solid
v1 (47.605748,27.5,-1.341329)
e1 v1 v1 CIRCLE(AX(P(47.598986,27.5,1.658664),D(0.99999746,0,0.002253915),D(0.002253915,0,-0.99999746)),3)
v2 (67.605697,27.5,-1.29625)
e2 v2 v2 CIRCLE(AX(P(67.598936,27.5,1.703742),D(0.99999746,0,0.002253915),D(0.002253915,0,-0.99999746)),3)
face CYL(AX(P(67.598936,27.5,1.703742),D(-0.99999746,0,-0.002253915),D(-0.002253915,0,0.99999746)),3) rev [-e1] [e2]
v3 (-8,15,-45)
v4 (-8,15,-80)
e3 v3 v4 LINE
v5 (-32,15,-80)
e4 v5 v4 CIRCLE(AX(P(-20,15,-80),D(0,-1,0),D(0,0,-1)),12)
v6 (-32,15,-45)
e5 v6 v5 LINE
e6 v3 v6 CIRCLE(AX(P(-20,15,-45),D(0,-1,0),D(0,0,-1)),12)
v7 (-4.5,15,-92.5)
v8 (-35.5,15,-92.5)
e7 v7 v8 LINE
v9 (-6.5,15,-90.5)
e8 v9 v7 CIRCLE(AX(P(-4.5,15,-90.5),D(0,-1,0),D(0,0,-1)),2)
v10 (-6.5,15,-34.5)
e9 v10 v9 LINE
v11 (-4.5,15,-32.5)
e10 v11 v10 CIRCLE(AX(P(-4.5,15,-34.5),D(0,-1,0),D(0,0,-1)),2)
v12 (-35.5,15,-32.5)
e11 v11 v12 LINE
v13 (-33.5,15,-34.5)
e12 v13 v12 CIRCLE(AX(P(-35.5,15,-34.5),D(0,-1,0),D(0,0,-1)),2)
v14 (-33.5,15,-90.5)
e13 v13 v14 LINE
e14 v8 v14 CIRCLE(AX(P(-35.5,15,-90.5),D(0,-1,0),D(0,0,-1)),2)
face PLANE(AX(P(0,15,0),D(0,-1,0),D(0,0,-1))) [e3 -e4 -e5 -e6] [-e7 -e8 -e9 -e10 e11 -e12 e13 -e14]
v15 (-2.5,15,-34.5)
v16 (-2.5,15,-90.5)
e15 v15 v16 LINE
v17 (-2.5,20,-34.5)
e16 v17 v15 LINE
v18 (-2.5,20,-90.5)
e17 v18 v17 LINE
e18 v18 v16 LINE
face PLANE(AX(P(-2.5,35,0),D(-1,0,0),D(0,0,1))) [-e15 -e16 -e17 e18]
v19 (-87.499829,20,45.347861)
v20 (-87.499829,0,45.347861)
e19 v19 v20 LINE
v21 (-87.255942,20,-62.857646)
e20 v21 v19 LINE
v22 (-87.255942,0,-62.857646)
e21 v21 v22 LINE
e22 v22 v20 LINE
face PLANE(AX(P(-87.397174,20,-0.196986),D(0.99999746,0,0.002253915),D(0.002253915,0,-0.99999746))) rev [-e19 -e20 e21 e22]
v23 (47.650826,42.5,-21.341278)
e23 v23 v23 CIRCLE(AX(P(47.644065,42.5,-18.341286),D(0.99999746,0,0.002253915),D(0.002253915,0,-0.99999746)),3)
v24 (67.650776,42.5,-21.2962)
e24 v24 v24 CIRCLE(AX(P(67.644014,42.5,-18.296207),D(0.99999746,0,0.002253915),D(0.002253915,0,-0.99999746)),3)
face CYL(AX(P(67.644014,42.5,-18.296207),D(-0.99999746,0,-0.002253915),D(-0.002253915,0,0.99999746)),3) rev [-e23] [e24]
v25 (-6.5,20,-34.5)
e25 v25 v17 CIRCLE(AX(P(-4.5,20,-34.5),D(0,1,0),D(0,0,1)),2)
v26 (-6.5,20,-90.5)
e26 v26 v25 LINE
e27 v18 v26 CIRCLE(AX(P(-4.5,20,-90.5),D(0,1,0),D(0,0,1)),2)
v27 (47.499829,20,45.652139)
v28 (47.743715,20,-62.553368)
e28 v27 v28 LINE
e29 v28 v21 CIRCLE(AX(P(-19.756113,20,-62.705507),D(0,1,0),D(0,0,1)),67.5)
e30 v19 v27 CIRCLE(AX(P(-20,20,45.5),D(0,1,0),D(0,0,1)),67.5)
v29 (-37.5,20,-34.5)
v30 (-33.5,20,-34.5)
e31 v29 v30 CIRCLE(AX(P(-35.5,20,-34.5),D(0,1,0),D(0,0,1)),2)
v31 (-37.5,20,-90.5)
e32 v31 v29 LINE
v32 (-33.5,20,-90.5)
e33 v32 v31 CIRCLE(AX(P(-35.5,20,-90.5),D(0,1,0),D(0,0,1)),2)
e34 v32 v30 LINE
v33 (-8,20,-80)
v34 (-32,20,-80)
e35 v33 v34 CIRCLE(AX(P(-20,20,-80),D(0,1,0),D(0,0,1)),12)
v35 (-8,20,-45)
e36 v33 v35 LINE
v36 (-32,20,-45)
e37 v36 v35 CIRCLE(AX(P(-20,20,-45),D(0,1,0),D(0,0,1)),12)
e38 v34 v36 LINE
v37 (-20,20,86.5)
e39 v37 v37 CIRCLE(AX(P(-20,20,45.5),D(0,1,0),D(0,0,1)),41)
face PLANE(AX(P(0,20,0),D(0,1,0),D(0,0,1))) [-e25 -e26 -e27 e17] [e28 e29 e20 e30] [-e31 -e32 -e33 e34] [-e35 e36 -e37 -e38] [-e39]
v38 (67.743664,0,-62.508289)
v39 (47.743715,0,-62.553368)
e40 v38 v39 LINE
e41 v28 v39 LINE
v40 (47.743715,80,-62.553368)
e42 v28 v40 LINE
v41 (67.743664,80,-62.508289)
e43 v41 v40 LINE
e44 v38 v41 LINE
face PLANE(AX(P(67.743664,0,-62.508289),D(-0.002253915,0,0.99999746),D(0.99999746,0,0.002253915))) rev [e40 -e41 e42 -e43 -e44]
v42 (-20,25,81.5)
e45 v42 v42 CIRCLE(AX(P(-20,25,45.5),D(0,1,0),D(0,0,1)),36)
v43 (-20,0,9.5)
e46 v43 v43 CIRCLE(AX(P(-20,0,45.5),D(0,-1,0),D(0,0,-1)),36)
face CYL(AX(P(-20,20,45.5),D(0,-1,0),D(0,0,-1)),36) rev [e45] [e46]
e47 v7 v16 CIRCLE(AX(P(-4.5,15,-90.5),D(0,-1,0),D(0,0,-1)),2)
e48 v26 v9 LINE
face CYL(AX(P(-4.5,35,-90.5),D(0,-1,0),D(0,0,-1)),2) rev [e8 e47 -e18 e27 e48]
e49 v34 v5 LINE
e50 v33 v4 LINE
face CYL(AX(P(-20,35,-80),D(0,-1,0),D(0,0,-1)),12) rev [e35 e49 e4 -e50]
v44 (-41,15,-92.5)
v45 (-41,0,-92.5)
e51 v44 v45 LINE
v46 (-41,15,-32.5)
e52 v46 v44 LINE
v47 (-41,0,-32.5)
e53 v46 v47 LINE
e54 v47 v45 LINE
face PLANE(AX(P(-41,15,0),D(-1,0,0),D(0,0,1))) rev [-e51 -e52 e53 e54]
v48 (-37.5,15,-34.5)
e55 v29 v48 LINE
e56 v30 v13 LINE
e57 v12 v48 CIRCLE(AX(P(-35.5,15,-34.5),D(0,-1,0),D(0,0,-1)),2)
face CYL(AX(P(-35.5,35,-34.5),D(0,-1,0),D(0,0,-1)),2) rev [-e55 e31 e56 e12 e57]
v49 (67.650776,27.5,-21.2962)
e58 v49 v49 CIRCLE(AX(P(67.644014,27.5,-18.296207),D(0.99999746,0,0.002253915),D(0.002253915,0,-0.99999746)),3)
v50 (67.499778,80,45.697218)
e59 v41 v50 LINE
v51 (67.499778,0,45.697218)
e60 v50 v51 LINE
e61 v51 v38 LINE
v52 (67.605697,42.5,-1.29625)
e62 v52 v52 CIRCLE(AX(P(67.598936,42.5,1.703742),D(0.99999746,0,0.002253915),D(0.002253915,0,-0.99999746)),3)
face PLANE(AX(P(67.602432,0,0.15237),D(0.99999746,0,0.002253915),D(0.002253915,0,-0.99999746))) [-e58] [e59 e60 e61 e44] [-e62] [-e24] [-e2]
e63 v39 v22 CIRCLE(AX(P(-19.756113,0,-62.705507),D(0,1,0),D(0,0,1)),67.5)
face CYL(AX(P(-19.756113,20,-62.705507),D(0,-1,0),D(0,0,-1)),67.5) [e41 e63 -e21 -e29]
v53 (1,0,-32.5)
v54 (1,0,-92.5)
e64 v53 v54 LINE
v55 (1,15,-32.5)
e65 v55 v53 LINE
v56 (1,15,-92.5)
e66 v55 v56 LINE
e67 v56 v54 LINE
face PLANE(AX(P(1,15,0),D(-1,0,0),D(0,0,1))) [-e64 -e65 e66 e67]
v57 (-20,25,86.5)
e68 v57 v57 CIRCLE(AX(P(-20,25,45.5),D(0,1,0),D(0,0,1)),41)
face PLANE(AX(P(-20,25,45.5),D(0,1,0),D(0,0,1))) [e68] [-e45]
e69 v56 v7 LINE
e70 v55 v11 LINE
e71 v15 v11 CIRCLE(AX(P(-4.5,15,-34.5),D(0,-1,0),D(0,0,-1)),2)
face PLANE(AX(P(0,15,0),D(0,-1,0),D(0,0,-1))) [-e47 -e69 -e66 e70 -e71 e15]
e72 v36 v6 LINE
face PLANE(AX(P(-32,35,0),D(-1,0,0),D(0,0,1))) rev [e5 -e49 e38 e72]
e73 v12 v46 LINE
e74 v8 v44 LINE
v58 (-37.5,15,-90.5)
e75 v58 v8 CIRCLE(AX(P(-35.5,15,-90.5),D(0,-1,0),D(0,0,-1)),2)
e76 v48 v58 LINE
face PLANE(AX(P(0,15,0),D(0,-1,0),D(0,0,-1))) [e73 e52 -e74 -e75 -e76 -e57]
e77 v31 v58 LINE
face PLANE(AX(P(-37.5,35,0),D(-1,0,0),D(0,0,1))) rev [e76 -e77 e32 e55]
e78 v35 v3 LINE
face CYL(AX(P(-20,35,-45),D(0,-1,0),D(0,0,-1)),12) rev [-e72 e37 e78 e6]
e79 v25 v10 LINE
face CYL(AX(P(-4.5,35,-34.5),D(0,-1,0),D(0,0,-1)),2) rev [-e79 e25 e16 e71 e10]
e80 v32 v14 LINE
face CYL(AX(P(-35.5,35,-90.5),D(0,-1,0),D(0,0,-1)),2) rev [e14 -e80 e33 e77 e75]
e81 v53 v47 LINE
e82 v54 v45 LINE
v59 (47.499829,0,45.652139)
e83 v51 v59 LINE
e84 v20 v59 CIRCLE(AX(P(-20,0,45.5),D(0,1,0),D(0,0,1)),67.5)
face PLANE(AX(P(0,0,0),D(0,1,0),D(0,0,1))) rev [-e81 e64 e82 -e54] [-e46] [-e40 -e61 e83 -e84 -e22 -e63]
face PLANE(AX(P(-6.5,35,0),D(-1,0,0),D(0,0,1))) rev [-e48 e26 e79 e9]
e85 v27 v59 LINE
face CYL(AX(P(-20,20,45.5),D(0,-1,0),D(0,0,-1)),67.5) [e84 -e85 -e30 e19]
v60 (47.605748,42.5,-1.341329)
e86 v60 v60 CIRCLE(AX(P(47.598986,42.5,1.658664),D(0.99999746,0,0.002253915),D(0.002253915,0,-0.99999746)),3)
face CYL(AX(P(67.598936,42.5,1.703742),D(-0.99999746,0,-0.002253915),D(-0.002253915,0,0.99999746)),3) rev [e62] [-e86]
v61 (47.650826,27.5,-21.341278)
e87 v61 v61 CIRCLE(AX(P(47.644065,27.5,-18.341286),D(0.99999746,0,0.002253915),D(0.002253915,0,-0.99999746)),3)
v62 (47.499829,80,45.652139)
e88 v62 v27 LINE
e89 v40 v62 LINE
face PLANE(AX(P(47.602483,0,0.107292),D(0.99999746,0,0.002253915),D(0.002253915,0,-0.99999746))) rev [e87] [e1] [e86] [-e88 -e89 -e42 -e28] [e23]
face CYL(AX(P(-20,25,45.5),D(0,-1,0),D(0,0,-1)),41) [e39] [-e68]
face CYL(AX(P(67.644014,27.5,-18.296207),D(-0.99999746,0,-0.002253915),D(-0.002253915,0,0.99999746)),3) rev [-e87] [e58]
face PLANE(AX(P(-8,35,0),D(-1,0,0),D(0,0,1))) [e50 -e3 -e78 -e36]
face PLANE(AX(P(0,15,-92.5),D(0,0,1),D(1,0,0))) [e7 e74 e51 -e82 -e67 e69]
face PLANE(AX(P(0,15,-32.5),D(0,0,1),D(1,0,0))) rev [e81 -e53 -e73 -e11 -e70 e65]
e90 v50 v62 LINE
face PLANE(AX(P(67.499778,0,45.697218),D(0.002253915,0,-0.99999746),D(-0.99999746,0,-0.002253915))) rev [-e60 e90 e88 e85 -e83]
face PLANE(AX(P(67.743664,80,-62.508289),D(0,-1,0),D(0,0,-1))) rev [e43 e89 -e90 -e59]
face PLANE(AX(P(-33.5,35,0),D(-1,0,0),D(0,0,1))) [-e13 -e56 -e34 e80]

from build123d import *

# Parameters (mm, degrees)
BOSS_EXTRUDE1_DEPTH = 20
SKETCH8_W           = 42
SKETCH8_H           = 60
CUT_EXTRUDE1_DEPTH  = 15
CUT_EXTRUDE2_START  = -5
CUT_EXTRUDE2_DEPTH  = 5
SKETCH10_R          = 36
CUT_EXTRUDE3_DEPTH  = 159.144630057
SKETCH11_R          = 41
SKETCH11_R_2        = 36
BOSS_EXTRUDE4_DEPTH = 5
SKETCH2_W           = 108.205781707
SKETCH2_H           = 80
SKETCH2_R           = 3
BOSS_EXTRUDE6_DEPTH = 20


# Read off the part's stored shape, not the designer's step: Cut-Extrude2
with BuildPart() as part:
    # Sketch1 → Boss-Extrude1 (new body)
    with BuildSketch(Plane(origin=(0, 0, 0), x_dir=(1, 0, 0), z_dir=(0, 1, 0))):
        with BuildLine():
            Line((47.743715131, 62.553367624), (47.499828545, -45.652139232))
            ThreePointArc((47.499828545, -45.652139232), (-20.152139232, -112.999828545), (-87.499828545, -45.347860768))
            Line((-87.499828545, -45.347860768), (-87.25594196, 62.857646088))
            ThreePointArc((-87.25594196, 62.857646088), (-19.603974182, 130.205335402), (47.743715131, 62.553367624))
        make_face()
    extrude(amount=BOSS_EXTRUDE1_DEPTH)

    # Sketch8 → Cut-Extrude1 (cut)
    with BuildSketch(Plane.XZ):
        with Locations((-20, -62.5)):
            Rectangle(SKETCH8_W, SKETCH8_H)
    extrude(amount=-CUT_EXTRUDE1_DEPTH, mode=Mode.SUBTRACT)

    # Cut-Extrude2 outline → Cut-Extrude2 (cut)
    with BuildSketch(Plane.XZ.offset(-15).offset(CUT_EXTRUDE2_START)):
        with BuildLine():
            Line((-6.5, -34.5), (-6.5, -90.5))
            ThreePointArc((-6.5, -90.5), (-4.5, -92.5), (-2.5, -90.5))
            Line((-2.5, -90.5), (-2.5, -34.5))
            ThreePointArc((-2.5, -34.5), (-4.5, -32.5), (-6.5, -34.5))
        make_face()
        with BuildLine():
            ThreePointArc((-8, -45), (-20, -33), (-32, -45))
            Line((-32, -45), (-32, -80))
            ThreePointArc((-32, -80), (-20, -92), (-8, -80))
            Line((-8, -80), (-8, -45))
        make_face()
        with BuildLine():
            Line((-37.5, -34.5), (-37.5, -90.5))
            ThreePointArc((-37.5, -90.5), (-35.5, -92.5), (-33.5, -90.5))
            Line((-33.5, -90.5), (-33.5, -34.5))
            ThreePointArc((-33.5, -34.5), (-35.5, -32.5), (-37.5, -34.5))
        make_face()
    extrude(amount=CUT_EXTRUDE2_DEPTH, mode=Mode.SUBTRACT)

    # Sketch10 → Cut-Extrude3 (cut, through all)
    with BuildSketch(Plane.XZ):
        with Locations(Location((-20, 45.5, 0), (0, 0, 270))):
            Circle(SKETCH10_R)
    extrude(amount=-CUT_EXTRUDE3_DEPTH, mode=Mode.SUBTRACT)

    # Sketch11 → Boss-Extrude4 (add)
    with BuildSketch(Plane(origin=(0, 20, 0), x_dir=(1, 0, 0), z_dir=(0, 1, 0))):
        with Locations(Location((-20, -45.5, 0), (0, 0, 270))):
            Circle(SKETCH11_R)
        with Locations(Location((-20, -45.5, 0), (0, 0, 90))):
            Circle(SKETCH11_R_2, mode=Mode.SUBTRACT)
    extrude(amount=BOSS_EXTRUDE4_DEPTH)

    # Sketch2 → Boss-Extrude6 (add)
    with BuildSketch(Plane(origin=(47.602482999, 0, 0.107292202), x_dir=(0.002253914548687051, 0, -0.9999974599313777), z_dir=(0.9999974599313777, 0, 0.002253914548687051))):
        with Locations((8.557928136, 40)):
            Rectangle(SKETCH2_W, SKETCH2_H)
        with Locations((-1.551375347, 27.5)):
            Circle(SKETCH2_R, mode=Mode.SUBTRACT)
        with Locations((18.448624653, 27.5)):
            Circle(SKETCH2_R, mode=Mode.SUBTRACT)
        with Locations((18.448624653, 42.5)):
            Circle(SKETCH2_R, mode=Mode.SUBTRACT)
        with Locations((-1.551375347, 42.5)):
            Circle(SKETCH2_R, mode=Mode.SUBTRACT)
    extrude(amount=BOSS_EXTRUDE6_DEPTH)


solid = part.part
